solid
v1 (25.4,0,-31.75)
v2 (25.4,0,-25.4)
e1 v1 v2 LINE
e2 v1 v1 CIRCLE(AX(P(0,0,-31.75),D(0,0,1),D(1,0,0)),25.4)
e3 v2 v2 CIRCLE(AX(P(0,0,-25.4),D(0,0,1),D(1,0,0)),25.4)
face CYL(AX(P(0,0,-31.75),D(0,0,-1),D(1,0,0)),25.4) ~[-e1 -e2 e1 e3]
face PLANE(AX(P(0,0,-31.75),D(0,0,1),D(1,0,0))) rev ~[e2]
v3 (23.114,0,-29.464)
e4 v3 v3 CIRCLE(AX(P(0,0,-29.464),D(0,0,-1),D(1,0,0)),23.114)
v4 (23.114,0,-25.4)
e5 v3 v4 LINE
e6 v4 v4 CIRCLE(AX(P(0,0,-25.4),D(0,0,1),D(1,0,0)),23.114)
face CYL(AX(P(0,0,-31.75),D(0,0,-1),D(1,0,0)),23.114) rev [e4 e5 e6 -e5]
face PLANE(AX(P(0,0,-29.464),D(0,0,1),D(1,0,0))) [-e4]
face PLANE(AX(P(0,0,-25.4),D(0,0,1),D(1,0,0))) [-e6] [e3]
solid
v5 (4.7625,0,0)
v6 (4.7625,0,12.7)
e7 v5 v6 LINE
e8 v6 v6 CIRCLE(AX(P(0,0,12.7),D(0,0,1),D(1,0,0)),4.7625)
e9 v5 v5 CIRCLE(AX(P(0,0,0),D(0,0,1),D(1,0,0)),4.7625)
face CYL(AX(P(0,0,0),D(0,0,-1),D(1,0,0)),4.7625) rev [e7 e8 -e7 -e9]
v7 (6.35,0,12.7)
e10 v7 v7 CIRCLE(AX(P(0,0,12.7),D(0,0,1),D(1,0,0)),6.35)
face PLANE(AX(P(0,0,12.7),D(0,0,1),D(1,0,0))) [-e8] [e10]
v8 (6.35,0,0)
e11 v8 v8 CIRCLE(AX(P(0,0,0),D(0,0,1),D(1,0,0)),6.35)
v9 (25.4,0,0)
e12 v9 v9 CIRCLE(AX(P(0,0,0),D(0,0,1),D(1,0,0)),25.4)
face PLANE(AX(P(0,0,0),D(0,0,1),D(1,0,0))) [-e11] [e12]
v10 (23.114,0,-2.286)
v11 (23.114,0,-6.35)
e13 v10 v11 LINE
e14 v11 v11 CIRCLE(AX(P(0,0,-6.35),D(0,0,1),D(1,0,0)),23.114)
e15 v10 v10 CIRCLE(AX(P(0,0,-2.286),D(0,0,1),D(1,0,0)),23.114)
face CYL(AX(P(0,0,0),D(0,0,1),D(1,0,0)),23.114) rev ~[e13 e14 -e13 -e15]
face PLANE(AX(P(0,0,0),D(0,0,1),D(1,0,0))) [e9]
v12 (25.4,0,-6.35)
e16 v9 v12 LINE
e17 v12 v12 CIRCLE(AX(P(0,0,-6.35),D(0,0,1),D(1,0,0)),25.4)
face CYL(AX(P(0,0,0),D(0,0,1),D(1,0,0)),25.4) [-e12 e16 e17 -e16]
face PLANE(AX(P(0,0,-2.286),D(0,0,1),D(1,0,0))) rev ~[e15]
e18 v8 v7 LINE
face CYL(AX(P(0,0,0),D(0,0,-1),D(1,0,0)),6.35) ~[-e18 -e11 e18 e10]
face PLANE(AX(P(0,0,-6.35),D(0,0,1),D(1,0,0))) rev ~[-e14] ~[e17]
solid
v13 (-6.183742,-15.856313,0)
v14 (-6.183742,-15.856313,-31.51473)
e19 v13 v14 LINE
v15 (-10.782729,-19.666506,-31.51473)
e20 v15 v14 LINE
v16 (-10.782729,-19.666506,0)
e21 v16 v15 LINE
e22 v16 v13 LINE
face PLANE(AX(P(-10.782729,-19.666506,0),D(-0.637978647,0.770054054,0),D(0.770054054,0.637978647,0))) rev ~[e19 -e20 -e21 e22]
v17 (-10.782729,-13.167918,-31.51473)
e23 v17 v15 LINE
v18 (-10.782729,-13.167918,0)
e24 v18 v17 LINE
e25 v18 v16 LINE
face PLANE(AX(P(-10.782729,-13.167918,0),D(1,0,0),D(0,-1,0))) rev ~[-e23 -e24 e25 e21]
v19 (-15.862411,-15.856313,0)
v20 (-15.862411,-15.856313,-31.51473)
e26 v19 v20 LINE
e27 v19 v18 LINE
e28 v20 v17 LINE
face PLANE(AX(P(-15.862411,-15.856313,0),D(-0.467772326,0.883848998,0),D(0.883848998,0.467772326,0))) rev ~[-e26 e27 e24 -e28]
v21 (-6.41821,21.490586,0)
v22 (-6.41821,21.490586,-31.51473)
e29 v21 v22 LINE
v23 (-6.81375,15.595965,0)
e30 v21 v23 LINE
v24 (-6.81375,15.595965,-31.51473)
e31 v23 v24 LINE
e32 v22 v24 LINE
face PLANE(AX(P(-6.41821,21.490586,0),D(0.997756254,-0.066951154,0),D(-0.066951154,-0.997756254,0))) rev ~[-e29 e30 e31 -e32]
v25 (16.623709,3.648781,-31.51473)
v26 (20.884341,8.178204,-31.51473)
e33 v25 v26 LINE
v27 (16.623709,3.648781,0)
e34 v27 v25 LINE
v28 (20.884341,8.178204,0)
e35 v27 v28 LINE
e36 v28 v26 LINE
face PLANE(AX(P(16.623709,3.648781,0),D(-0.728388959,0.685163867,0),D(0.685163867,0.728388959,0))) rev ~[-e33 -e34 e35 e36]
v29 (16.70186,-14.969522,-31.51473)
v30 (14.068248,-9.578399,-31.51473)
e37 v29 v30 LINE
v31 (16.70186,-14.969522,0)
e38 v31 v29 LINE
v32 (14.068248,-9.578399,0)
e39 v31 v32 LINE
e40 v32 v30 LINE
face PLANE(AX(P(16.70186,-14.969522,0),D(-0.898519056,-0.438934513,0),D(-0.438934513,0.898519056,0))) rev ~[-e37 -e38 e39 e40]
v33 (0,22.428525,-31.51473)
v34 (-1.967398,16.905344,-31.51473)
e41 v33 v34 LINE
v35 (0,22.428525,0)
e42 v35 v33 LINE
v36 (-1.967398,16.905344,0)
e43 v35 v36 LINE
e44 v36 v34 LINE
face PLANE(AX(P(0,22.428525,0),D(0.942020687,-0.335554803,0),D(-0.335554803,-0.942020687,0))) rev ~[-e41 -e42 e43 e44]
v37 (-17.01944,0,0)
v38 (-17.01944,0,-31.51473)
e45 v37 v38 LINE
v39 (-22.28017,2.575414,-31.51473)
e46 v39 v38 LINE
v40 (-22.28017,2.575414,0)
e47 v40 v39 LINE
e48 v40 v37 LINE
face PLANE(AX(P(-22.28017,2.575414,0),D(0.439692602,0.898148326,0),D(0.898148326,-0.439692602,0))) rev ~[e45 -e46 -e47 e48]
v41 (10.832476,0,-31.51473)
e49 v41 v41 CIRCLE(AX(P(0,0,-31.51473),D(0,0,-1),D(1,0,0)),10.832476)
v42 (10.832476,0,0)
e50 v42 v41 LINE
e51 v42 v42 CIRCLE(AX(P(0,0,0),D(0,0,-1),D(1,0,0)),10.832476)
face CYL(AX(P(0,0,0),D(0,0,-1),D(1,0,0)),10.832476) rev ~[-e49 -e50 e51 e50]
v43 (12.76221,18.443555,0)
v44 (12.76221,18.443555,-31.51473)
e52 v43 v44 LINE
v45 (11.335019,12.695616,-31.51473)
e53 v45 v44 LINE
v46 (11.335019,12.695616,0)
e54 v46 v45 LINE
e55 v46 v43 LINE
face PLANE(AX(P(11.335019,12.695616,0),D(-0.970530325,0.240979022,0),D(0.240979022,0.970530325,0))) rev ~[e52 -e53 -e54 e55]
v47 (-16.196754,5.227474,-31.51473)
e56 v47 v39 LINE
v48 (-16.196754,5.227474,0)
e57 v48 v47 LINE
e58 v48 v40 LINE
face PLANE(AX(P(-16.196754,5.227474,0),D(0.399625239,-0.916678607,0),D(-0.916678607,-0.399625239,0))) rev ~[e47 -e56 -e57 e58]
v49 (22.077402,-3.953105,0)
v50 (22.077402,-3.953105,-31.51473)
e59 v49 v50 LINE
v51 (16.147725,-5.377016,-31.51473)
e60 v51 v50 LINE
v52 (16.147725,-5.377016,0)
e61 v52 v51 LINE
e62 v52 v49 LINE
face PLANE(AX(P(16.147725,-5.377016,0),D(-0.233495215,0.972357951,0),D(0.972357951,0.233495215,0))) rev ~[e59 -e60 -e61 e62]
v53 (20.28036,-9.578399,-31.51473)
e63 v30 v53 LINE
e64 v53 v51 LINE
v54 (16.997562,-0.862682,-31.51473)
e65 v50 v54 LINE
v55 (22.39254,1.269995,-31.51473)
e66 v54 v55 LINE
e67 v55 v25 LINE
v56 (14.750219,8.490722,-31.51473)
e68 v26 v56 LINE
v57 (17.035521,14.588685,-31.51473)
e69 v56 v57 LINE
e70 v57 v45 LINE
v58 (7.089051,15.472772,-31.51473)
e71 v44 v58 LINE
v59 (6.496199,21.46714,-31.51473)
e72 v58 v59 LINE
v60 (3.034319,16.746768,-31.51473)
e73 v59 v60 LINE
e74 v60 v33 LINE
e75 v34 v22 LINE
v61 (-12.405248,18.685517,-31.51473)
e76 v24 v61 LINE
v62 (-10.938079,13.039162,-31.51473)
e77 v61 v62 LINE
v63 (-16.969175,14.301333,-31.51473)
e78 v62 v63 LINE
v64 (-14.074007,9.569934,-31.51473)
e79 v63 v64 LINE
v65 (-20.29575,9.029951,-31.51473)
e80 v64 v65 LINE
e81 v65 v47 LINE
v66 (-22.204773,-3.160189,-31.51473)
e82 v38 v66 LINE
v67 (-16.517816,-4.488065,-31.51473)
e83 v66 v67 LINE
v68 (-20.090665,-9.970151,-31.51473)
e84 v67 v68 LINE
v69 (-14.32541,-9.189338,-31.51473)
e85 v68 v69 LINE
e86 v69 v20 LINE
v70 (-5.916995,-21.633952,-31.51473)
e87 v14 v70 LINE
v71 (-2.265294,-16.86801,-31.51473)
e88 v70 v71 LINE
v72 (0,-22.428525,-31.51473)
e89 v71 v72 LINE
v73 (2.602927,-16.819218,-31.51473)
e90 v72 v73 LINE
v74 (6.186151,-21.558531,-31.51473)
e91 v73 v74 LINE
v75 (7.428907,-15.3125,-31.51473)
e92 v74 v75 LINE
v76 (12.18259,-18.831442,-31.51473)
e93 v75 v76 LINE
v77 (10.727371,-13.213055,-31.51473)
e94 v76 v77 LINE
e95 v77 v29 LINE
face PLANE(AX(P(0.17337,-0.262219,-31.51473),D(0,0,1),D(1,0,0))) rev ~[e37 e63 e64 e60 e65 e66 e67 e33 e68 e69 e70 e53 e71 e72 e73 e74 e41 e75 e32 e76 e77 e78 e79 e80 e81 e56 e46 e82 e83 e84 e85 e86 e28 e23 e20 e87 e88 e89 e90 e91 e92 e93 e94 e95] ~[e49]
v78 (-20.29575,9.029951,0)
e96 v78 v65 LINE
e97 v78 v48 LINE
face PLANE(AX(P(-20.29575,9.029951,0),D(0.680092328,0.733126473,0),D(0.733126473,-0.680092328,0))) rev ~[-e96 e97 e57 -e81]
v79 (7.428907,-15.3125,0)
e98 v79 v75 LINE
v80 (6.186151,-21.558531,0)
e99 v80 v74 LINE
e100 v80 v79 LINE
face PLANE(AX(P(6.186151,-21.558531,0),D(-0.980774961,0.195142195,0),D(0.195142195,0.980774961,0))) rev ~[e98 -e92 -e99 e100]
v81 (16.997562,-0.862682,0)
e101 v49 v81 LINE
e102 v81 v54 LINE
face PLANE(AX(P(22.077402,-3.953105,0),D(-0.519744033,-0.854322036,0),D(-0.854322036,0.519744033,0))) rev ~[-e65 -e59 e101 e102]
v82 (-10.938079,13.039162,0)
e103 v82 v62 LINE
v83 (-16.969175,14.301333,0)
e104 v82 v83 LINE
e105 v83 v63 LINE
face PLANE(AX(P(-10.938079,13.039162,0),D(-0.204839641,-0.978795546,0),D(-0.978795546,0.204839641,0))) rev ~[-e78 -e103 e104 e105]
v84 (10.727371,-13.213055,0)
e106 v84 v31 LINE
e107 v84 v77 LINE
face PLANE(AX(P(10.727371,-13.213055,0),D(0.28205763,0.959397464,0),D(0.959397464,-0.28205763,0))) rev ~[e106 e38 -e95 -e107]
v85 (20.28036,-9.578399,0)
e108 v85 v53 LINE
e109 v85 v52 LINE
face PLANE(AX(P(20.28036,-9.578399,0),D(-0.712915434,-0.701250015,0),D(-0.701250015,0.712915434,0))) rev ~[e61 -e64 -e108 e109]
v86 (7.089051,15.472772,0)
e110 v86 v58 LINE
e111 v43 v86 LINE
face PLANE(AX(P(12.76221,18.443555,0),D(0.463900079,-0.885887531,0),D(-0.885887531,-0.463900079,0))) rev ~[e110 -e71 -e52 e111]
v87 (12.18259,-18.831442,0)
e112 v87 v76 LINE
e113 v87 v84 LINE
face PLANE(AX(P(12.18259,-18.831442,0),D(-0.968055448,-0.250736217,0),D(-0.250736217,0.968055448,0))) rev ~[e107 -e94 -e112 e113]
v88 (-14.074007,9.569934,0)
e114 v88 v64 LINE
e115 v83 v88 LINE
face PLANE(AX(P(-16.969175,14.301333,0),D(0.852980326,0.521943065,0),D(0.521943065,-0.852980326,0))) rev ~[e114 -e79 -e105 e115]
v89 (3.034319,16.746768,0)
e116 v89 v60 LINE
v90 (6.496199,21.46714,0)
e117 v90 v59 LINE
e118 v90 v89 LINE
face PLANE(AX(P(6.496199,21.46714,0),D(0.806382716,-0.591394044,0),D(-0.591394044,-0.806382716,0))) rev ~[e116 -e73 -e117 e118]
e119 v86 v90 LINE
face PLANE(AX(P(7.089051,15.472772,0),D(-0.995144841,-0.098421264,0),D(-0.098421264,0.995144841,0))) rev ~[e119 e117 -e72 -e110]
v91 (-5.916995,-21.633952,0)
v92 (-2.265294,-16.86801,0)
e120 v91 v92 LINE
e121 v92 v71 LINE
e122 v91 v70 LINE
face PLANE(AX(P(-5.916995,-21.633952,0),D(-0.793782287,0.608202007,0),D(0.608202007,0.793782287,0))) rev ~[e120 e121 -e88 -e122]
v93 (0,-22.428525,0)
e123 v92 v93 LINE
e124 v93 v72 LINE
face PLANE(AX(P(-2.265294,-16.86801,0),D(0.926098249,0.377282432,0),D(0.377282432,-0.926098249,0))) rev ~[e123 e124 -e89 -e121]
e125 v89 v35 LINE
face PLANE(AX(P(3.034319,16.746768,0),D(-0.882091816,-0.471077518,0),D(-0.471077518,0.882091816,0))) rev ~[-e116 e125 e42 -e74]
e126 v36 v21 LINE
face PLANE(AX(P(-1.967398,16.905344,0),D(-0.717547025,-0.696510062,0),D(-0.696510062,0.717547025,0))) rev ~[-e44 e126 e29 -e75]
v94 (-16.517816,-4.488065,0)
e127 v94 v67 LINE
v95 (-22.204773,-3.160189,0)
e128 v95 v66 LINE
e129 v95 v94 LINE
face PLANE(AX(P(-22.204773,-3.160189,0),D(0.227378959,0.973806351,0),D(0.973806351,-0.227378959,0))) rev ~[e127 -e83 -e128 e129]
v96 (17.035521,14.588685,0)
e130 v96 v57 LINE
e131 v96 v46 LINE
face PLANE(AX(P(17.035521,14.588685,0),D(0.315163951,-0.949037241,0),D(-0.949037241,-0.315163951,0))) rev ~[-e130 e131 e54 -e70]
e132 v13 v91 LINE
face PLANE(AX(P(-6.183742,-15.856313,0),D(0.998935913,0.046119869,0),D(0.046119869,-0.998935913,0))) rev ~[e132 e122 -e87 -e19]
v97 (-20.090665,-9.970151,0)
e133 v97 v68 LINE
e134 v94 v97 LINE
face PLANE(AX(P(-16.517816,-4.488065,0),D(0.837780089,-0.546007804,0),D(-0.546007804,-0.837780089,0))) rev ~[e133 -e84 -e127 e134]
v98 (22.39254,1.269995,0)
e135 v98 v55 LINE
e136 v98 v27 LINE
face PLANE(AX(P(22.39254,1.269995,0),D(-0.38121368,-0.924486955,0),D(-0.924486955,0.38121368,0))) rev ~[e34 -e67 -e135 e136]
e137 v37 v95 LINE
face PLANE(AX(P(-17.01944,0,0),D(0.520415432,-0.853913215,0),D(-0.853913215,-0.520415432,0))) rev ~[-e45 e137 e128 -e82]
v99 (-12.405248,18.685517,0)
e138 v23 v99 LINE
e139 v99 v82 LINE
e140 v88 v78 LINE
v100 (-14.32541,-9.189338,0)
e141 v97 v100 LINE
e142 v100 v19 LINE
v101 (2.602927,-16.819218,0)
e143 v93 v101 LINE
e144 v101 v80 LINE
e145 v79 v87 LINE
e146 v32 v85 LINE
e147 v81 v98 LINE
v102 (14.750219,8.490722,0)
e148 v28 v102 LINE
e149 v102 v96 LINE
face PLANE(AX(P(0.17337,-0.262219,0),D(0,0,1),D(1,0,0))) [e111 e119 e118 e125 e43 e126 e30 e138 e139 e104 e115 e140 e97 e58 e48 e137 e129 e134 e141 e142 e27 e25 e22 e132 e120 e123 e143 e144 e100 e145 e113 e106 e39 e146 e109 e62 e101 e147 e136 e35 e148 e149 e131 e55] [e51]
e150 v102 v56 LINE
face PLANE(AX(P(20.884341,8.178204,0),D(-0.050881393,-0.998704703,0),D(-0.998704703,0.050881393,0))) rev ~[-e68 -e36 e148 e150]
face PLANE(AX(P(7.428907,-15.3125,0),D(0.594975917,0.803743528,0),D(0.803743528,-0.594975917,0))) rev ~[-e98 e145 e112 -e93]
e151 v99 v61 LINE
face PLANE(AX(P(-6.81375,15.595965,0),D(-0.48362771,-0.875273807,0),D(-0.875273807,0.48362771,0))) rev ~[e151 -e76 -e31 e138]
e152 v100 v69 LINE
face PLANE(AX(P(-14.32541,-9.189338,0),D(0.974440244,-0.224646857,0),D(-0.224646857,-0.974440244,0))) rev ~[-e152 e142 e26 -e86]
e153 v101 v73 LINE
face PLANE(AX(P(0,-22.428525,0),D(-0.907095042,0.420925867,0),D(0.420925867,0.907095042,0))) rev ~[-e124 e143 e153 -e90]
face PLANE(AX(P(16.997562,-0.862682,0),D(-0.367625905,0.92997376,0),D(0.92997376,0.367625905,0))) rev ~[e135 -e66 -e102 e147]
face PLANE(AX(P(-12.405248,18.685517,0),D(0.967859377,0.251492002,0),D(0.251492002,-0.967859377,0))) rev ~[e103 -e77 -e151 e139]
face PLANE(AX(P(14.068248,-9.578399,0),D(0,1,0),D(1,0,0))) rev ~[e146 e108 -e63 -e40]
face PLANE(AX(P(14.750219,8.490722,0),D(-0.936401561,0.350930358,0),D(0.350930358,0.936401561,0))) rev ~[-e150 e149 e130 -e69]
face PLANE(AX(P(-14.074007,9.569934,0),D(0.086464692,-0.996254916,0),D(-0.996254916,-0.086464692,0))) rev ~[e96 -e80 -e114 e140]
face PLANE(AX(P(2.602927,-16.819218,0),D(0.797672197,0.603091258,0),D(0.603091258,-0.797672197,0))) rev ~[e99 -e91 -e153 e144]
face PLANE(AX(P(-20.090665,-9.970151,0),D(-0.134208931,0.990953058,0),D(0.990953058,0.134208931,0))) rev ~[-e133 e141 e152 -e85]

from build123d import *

# Parameters (mm, degrees)
F0_R     = 6.35
F0_R_2   = 4.7625
F1_DEPTH = 12.7
F2_R     = 25.4
F3_DEPTH = 6.35
F4_T     = 2.286
F6_R     = 25.4
F7_DEPTH = 6.35
F8_T     = -2.286
F9_R     = 10.8324762704


# Not quite as in the source:
# - a shell that OpenCascade refuses in one call is made with other operations: the cavity is built on its own and cut out


with BuildPart() as f1:
    # F0 (on Top) → F1 (new body)
    with BuildSketch(Plane.XY):
        Circle(F0_R)
        Circle(F0_R_2, mode=Mode.SUBTRACT)
    extrude(amount=F1_DEPTH)

    # F2 (on Top) → F3 (join)
    with BuildSketch(Plane.XY):
        Circle(F2_R)
    extrude(amount=-F3_DEPTH)

    # F4: shell of thickness 2.286, made by hand


with BuildPart() as f4_core1:
    # F4_t2: copy of F1
    add(f1.part)

    # the walls: a layer under each face that stays
    f4_faces = [f4_core1.faces().sort_by_distance(p)[0] for p in [
        (-25.4, 0, -3.175),
        (-16.9333333333, -16.9333333333, 0),
        (-6.35, 0, 6.35),
        (-4.2333333333, -4.2333333333, 12.7),
        (-4.7625, 0, 6.35),
        (0, 0, 0),
    ]]
    thicken(f4_faces, amount=-F4_T, mode=Mode.SUBTRACT)

    # F4_s3 → F4_t4 (revolve, cut)
    with BuildSketch(Plane.XZ):
        Polygon((6.37286, 0.02286), (6.35, -2.286), (4.064, -2.286), (4.064, 0), align=None)
    revolve(axis=Axis((0, 0, 0), (0, 0, 1)), mode=Mode.SUBTRACT)

    # F4_s5 → F4_t6 (revolve, cut)
    with BuildSketch(Plane.XZ):
        Polygon((4.73964, 0.02286), (7.0485, 0), (7.0485, -2.286), (4.7625, -2.286), align=None)
    revolve(axis=Axis((0, 0, 0), (0, 0, 1)), mode=Mode.SUBTRACT)


with BuildPart() as f1_1:
    add(f1.part)

    # what is left inside the walls is the cavity
    f4_cavity = [f4_core1.part.solids().sort_by_distance(p)[0] for p in [
        (0, -7.704667, -2.30886),
    ]]
    add(f4_cavity, mode=Mode.SUBTRACT)


with BuildPart() as f7:
    # F6 (on offset) → F7 (new body)
    with BuildSketch(Plane.XY.offset(-31.75)):
        Circle(F6_R)
    extrude(amount=F7_DEPTH)

    # F8
    f8_openings = [f7.faces().sort_by_distance(p)[0] for p in [
        (0, 0, -25.4),
    ]]
    offset(amount=F8_T, openings=f8_openings)


with BuildPart() as f11:
    # F11: sweep along a path in F10
    with BuildLine(Plane.YZ) as f11_path:
        Line((0, 0), (0, -31.5147303045))
    # F9 (on Top) → F11 (sweep)
    with BuildSketch(Plane.XY):
        Polygon((-22.2801696853, 2.5754143982), (-17.0194395337, 0), (-22.2047725652, -3.1601892119), (-16.5178161114, -4.4880653732), (-20.0906647852, -9.9701509023), (-14.3254104125, -9.1893383088), (-15.8624105906, -15.8563126477), (-10.7827289936, -13.167918495), (-10.7827289936, -19.6665064508), (-6.1837424961, -15.8563126477), (-5.9169946662, -21.6339523585), (-2.2652936168, -16.8680101633), (0, -22.4285247069), (2.6029271509, -16.8192179452), (6.1861512021, -21.558530883), (7.4289074138, -15.3125000139), (12.1825904339, -18.8314420809), (10.7273710707, -13.2130553602), (16.7018596911, -14.9695224836), (14.0682479763, -9.5783986615), (20.2803599477, -9.5783986615), (16.1477248117, -5.3770164073), (22.0774019915, -3.9531053404), (16.99756164, -0.8626820586), (22.3925396791, 1.2699949796), (16.6237094694, 3.648781374), (20.8843409163, 8.1782042663), (14.7502192053, 8.4907217263), (17.0355213321, 14.588685118), (11.3350188011, 12.6956162047), (12.7622102664, 18.4435546911), (7.0890507934, 15.4727722432), (6.4961991134, 21.4671404152), (3.0343190109, 16.7467677532), (0, 22.4285247069), (-1.9673980921, 16.9053443262), (-6.4182103819, 21.4905862186), (-6.8137495325, 15.595965483), (-12.4052478598, 18.6855170136), (-10.9380790438, 13.0391621231), (-16.9691750647, 14.3013333161), (-14.0740074147, 9.5699340295), (-20.2957504461, 9.0299506542), (-16.1967538501, 5.2274742237), align=None)
        Circle(F9_R, mode=Mode.SUBTRACT)
    sweep(path=f11_path.line)


solid = Compound([f1_1.part, f7.part, f11.part])
